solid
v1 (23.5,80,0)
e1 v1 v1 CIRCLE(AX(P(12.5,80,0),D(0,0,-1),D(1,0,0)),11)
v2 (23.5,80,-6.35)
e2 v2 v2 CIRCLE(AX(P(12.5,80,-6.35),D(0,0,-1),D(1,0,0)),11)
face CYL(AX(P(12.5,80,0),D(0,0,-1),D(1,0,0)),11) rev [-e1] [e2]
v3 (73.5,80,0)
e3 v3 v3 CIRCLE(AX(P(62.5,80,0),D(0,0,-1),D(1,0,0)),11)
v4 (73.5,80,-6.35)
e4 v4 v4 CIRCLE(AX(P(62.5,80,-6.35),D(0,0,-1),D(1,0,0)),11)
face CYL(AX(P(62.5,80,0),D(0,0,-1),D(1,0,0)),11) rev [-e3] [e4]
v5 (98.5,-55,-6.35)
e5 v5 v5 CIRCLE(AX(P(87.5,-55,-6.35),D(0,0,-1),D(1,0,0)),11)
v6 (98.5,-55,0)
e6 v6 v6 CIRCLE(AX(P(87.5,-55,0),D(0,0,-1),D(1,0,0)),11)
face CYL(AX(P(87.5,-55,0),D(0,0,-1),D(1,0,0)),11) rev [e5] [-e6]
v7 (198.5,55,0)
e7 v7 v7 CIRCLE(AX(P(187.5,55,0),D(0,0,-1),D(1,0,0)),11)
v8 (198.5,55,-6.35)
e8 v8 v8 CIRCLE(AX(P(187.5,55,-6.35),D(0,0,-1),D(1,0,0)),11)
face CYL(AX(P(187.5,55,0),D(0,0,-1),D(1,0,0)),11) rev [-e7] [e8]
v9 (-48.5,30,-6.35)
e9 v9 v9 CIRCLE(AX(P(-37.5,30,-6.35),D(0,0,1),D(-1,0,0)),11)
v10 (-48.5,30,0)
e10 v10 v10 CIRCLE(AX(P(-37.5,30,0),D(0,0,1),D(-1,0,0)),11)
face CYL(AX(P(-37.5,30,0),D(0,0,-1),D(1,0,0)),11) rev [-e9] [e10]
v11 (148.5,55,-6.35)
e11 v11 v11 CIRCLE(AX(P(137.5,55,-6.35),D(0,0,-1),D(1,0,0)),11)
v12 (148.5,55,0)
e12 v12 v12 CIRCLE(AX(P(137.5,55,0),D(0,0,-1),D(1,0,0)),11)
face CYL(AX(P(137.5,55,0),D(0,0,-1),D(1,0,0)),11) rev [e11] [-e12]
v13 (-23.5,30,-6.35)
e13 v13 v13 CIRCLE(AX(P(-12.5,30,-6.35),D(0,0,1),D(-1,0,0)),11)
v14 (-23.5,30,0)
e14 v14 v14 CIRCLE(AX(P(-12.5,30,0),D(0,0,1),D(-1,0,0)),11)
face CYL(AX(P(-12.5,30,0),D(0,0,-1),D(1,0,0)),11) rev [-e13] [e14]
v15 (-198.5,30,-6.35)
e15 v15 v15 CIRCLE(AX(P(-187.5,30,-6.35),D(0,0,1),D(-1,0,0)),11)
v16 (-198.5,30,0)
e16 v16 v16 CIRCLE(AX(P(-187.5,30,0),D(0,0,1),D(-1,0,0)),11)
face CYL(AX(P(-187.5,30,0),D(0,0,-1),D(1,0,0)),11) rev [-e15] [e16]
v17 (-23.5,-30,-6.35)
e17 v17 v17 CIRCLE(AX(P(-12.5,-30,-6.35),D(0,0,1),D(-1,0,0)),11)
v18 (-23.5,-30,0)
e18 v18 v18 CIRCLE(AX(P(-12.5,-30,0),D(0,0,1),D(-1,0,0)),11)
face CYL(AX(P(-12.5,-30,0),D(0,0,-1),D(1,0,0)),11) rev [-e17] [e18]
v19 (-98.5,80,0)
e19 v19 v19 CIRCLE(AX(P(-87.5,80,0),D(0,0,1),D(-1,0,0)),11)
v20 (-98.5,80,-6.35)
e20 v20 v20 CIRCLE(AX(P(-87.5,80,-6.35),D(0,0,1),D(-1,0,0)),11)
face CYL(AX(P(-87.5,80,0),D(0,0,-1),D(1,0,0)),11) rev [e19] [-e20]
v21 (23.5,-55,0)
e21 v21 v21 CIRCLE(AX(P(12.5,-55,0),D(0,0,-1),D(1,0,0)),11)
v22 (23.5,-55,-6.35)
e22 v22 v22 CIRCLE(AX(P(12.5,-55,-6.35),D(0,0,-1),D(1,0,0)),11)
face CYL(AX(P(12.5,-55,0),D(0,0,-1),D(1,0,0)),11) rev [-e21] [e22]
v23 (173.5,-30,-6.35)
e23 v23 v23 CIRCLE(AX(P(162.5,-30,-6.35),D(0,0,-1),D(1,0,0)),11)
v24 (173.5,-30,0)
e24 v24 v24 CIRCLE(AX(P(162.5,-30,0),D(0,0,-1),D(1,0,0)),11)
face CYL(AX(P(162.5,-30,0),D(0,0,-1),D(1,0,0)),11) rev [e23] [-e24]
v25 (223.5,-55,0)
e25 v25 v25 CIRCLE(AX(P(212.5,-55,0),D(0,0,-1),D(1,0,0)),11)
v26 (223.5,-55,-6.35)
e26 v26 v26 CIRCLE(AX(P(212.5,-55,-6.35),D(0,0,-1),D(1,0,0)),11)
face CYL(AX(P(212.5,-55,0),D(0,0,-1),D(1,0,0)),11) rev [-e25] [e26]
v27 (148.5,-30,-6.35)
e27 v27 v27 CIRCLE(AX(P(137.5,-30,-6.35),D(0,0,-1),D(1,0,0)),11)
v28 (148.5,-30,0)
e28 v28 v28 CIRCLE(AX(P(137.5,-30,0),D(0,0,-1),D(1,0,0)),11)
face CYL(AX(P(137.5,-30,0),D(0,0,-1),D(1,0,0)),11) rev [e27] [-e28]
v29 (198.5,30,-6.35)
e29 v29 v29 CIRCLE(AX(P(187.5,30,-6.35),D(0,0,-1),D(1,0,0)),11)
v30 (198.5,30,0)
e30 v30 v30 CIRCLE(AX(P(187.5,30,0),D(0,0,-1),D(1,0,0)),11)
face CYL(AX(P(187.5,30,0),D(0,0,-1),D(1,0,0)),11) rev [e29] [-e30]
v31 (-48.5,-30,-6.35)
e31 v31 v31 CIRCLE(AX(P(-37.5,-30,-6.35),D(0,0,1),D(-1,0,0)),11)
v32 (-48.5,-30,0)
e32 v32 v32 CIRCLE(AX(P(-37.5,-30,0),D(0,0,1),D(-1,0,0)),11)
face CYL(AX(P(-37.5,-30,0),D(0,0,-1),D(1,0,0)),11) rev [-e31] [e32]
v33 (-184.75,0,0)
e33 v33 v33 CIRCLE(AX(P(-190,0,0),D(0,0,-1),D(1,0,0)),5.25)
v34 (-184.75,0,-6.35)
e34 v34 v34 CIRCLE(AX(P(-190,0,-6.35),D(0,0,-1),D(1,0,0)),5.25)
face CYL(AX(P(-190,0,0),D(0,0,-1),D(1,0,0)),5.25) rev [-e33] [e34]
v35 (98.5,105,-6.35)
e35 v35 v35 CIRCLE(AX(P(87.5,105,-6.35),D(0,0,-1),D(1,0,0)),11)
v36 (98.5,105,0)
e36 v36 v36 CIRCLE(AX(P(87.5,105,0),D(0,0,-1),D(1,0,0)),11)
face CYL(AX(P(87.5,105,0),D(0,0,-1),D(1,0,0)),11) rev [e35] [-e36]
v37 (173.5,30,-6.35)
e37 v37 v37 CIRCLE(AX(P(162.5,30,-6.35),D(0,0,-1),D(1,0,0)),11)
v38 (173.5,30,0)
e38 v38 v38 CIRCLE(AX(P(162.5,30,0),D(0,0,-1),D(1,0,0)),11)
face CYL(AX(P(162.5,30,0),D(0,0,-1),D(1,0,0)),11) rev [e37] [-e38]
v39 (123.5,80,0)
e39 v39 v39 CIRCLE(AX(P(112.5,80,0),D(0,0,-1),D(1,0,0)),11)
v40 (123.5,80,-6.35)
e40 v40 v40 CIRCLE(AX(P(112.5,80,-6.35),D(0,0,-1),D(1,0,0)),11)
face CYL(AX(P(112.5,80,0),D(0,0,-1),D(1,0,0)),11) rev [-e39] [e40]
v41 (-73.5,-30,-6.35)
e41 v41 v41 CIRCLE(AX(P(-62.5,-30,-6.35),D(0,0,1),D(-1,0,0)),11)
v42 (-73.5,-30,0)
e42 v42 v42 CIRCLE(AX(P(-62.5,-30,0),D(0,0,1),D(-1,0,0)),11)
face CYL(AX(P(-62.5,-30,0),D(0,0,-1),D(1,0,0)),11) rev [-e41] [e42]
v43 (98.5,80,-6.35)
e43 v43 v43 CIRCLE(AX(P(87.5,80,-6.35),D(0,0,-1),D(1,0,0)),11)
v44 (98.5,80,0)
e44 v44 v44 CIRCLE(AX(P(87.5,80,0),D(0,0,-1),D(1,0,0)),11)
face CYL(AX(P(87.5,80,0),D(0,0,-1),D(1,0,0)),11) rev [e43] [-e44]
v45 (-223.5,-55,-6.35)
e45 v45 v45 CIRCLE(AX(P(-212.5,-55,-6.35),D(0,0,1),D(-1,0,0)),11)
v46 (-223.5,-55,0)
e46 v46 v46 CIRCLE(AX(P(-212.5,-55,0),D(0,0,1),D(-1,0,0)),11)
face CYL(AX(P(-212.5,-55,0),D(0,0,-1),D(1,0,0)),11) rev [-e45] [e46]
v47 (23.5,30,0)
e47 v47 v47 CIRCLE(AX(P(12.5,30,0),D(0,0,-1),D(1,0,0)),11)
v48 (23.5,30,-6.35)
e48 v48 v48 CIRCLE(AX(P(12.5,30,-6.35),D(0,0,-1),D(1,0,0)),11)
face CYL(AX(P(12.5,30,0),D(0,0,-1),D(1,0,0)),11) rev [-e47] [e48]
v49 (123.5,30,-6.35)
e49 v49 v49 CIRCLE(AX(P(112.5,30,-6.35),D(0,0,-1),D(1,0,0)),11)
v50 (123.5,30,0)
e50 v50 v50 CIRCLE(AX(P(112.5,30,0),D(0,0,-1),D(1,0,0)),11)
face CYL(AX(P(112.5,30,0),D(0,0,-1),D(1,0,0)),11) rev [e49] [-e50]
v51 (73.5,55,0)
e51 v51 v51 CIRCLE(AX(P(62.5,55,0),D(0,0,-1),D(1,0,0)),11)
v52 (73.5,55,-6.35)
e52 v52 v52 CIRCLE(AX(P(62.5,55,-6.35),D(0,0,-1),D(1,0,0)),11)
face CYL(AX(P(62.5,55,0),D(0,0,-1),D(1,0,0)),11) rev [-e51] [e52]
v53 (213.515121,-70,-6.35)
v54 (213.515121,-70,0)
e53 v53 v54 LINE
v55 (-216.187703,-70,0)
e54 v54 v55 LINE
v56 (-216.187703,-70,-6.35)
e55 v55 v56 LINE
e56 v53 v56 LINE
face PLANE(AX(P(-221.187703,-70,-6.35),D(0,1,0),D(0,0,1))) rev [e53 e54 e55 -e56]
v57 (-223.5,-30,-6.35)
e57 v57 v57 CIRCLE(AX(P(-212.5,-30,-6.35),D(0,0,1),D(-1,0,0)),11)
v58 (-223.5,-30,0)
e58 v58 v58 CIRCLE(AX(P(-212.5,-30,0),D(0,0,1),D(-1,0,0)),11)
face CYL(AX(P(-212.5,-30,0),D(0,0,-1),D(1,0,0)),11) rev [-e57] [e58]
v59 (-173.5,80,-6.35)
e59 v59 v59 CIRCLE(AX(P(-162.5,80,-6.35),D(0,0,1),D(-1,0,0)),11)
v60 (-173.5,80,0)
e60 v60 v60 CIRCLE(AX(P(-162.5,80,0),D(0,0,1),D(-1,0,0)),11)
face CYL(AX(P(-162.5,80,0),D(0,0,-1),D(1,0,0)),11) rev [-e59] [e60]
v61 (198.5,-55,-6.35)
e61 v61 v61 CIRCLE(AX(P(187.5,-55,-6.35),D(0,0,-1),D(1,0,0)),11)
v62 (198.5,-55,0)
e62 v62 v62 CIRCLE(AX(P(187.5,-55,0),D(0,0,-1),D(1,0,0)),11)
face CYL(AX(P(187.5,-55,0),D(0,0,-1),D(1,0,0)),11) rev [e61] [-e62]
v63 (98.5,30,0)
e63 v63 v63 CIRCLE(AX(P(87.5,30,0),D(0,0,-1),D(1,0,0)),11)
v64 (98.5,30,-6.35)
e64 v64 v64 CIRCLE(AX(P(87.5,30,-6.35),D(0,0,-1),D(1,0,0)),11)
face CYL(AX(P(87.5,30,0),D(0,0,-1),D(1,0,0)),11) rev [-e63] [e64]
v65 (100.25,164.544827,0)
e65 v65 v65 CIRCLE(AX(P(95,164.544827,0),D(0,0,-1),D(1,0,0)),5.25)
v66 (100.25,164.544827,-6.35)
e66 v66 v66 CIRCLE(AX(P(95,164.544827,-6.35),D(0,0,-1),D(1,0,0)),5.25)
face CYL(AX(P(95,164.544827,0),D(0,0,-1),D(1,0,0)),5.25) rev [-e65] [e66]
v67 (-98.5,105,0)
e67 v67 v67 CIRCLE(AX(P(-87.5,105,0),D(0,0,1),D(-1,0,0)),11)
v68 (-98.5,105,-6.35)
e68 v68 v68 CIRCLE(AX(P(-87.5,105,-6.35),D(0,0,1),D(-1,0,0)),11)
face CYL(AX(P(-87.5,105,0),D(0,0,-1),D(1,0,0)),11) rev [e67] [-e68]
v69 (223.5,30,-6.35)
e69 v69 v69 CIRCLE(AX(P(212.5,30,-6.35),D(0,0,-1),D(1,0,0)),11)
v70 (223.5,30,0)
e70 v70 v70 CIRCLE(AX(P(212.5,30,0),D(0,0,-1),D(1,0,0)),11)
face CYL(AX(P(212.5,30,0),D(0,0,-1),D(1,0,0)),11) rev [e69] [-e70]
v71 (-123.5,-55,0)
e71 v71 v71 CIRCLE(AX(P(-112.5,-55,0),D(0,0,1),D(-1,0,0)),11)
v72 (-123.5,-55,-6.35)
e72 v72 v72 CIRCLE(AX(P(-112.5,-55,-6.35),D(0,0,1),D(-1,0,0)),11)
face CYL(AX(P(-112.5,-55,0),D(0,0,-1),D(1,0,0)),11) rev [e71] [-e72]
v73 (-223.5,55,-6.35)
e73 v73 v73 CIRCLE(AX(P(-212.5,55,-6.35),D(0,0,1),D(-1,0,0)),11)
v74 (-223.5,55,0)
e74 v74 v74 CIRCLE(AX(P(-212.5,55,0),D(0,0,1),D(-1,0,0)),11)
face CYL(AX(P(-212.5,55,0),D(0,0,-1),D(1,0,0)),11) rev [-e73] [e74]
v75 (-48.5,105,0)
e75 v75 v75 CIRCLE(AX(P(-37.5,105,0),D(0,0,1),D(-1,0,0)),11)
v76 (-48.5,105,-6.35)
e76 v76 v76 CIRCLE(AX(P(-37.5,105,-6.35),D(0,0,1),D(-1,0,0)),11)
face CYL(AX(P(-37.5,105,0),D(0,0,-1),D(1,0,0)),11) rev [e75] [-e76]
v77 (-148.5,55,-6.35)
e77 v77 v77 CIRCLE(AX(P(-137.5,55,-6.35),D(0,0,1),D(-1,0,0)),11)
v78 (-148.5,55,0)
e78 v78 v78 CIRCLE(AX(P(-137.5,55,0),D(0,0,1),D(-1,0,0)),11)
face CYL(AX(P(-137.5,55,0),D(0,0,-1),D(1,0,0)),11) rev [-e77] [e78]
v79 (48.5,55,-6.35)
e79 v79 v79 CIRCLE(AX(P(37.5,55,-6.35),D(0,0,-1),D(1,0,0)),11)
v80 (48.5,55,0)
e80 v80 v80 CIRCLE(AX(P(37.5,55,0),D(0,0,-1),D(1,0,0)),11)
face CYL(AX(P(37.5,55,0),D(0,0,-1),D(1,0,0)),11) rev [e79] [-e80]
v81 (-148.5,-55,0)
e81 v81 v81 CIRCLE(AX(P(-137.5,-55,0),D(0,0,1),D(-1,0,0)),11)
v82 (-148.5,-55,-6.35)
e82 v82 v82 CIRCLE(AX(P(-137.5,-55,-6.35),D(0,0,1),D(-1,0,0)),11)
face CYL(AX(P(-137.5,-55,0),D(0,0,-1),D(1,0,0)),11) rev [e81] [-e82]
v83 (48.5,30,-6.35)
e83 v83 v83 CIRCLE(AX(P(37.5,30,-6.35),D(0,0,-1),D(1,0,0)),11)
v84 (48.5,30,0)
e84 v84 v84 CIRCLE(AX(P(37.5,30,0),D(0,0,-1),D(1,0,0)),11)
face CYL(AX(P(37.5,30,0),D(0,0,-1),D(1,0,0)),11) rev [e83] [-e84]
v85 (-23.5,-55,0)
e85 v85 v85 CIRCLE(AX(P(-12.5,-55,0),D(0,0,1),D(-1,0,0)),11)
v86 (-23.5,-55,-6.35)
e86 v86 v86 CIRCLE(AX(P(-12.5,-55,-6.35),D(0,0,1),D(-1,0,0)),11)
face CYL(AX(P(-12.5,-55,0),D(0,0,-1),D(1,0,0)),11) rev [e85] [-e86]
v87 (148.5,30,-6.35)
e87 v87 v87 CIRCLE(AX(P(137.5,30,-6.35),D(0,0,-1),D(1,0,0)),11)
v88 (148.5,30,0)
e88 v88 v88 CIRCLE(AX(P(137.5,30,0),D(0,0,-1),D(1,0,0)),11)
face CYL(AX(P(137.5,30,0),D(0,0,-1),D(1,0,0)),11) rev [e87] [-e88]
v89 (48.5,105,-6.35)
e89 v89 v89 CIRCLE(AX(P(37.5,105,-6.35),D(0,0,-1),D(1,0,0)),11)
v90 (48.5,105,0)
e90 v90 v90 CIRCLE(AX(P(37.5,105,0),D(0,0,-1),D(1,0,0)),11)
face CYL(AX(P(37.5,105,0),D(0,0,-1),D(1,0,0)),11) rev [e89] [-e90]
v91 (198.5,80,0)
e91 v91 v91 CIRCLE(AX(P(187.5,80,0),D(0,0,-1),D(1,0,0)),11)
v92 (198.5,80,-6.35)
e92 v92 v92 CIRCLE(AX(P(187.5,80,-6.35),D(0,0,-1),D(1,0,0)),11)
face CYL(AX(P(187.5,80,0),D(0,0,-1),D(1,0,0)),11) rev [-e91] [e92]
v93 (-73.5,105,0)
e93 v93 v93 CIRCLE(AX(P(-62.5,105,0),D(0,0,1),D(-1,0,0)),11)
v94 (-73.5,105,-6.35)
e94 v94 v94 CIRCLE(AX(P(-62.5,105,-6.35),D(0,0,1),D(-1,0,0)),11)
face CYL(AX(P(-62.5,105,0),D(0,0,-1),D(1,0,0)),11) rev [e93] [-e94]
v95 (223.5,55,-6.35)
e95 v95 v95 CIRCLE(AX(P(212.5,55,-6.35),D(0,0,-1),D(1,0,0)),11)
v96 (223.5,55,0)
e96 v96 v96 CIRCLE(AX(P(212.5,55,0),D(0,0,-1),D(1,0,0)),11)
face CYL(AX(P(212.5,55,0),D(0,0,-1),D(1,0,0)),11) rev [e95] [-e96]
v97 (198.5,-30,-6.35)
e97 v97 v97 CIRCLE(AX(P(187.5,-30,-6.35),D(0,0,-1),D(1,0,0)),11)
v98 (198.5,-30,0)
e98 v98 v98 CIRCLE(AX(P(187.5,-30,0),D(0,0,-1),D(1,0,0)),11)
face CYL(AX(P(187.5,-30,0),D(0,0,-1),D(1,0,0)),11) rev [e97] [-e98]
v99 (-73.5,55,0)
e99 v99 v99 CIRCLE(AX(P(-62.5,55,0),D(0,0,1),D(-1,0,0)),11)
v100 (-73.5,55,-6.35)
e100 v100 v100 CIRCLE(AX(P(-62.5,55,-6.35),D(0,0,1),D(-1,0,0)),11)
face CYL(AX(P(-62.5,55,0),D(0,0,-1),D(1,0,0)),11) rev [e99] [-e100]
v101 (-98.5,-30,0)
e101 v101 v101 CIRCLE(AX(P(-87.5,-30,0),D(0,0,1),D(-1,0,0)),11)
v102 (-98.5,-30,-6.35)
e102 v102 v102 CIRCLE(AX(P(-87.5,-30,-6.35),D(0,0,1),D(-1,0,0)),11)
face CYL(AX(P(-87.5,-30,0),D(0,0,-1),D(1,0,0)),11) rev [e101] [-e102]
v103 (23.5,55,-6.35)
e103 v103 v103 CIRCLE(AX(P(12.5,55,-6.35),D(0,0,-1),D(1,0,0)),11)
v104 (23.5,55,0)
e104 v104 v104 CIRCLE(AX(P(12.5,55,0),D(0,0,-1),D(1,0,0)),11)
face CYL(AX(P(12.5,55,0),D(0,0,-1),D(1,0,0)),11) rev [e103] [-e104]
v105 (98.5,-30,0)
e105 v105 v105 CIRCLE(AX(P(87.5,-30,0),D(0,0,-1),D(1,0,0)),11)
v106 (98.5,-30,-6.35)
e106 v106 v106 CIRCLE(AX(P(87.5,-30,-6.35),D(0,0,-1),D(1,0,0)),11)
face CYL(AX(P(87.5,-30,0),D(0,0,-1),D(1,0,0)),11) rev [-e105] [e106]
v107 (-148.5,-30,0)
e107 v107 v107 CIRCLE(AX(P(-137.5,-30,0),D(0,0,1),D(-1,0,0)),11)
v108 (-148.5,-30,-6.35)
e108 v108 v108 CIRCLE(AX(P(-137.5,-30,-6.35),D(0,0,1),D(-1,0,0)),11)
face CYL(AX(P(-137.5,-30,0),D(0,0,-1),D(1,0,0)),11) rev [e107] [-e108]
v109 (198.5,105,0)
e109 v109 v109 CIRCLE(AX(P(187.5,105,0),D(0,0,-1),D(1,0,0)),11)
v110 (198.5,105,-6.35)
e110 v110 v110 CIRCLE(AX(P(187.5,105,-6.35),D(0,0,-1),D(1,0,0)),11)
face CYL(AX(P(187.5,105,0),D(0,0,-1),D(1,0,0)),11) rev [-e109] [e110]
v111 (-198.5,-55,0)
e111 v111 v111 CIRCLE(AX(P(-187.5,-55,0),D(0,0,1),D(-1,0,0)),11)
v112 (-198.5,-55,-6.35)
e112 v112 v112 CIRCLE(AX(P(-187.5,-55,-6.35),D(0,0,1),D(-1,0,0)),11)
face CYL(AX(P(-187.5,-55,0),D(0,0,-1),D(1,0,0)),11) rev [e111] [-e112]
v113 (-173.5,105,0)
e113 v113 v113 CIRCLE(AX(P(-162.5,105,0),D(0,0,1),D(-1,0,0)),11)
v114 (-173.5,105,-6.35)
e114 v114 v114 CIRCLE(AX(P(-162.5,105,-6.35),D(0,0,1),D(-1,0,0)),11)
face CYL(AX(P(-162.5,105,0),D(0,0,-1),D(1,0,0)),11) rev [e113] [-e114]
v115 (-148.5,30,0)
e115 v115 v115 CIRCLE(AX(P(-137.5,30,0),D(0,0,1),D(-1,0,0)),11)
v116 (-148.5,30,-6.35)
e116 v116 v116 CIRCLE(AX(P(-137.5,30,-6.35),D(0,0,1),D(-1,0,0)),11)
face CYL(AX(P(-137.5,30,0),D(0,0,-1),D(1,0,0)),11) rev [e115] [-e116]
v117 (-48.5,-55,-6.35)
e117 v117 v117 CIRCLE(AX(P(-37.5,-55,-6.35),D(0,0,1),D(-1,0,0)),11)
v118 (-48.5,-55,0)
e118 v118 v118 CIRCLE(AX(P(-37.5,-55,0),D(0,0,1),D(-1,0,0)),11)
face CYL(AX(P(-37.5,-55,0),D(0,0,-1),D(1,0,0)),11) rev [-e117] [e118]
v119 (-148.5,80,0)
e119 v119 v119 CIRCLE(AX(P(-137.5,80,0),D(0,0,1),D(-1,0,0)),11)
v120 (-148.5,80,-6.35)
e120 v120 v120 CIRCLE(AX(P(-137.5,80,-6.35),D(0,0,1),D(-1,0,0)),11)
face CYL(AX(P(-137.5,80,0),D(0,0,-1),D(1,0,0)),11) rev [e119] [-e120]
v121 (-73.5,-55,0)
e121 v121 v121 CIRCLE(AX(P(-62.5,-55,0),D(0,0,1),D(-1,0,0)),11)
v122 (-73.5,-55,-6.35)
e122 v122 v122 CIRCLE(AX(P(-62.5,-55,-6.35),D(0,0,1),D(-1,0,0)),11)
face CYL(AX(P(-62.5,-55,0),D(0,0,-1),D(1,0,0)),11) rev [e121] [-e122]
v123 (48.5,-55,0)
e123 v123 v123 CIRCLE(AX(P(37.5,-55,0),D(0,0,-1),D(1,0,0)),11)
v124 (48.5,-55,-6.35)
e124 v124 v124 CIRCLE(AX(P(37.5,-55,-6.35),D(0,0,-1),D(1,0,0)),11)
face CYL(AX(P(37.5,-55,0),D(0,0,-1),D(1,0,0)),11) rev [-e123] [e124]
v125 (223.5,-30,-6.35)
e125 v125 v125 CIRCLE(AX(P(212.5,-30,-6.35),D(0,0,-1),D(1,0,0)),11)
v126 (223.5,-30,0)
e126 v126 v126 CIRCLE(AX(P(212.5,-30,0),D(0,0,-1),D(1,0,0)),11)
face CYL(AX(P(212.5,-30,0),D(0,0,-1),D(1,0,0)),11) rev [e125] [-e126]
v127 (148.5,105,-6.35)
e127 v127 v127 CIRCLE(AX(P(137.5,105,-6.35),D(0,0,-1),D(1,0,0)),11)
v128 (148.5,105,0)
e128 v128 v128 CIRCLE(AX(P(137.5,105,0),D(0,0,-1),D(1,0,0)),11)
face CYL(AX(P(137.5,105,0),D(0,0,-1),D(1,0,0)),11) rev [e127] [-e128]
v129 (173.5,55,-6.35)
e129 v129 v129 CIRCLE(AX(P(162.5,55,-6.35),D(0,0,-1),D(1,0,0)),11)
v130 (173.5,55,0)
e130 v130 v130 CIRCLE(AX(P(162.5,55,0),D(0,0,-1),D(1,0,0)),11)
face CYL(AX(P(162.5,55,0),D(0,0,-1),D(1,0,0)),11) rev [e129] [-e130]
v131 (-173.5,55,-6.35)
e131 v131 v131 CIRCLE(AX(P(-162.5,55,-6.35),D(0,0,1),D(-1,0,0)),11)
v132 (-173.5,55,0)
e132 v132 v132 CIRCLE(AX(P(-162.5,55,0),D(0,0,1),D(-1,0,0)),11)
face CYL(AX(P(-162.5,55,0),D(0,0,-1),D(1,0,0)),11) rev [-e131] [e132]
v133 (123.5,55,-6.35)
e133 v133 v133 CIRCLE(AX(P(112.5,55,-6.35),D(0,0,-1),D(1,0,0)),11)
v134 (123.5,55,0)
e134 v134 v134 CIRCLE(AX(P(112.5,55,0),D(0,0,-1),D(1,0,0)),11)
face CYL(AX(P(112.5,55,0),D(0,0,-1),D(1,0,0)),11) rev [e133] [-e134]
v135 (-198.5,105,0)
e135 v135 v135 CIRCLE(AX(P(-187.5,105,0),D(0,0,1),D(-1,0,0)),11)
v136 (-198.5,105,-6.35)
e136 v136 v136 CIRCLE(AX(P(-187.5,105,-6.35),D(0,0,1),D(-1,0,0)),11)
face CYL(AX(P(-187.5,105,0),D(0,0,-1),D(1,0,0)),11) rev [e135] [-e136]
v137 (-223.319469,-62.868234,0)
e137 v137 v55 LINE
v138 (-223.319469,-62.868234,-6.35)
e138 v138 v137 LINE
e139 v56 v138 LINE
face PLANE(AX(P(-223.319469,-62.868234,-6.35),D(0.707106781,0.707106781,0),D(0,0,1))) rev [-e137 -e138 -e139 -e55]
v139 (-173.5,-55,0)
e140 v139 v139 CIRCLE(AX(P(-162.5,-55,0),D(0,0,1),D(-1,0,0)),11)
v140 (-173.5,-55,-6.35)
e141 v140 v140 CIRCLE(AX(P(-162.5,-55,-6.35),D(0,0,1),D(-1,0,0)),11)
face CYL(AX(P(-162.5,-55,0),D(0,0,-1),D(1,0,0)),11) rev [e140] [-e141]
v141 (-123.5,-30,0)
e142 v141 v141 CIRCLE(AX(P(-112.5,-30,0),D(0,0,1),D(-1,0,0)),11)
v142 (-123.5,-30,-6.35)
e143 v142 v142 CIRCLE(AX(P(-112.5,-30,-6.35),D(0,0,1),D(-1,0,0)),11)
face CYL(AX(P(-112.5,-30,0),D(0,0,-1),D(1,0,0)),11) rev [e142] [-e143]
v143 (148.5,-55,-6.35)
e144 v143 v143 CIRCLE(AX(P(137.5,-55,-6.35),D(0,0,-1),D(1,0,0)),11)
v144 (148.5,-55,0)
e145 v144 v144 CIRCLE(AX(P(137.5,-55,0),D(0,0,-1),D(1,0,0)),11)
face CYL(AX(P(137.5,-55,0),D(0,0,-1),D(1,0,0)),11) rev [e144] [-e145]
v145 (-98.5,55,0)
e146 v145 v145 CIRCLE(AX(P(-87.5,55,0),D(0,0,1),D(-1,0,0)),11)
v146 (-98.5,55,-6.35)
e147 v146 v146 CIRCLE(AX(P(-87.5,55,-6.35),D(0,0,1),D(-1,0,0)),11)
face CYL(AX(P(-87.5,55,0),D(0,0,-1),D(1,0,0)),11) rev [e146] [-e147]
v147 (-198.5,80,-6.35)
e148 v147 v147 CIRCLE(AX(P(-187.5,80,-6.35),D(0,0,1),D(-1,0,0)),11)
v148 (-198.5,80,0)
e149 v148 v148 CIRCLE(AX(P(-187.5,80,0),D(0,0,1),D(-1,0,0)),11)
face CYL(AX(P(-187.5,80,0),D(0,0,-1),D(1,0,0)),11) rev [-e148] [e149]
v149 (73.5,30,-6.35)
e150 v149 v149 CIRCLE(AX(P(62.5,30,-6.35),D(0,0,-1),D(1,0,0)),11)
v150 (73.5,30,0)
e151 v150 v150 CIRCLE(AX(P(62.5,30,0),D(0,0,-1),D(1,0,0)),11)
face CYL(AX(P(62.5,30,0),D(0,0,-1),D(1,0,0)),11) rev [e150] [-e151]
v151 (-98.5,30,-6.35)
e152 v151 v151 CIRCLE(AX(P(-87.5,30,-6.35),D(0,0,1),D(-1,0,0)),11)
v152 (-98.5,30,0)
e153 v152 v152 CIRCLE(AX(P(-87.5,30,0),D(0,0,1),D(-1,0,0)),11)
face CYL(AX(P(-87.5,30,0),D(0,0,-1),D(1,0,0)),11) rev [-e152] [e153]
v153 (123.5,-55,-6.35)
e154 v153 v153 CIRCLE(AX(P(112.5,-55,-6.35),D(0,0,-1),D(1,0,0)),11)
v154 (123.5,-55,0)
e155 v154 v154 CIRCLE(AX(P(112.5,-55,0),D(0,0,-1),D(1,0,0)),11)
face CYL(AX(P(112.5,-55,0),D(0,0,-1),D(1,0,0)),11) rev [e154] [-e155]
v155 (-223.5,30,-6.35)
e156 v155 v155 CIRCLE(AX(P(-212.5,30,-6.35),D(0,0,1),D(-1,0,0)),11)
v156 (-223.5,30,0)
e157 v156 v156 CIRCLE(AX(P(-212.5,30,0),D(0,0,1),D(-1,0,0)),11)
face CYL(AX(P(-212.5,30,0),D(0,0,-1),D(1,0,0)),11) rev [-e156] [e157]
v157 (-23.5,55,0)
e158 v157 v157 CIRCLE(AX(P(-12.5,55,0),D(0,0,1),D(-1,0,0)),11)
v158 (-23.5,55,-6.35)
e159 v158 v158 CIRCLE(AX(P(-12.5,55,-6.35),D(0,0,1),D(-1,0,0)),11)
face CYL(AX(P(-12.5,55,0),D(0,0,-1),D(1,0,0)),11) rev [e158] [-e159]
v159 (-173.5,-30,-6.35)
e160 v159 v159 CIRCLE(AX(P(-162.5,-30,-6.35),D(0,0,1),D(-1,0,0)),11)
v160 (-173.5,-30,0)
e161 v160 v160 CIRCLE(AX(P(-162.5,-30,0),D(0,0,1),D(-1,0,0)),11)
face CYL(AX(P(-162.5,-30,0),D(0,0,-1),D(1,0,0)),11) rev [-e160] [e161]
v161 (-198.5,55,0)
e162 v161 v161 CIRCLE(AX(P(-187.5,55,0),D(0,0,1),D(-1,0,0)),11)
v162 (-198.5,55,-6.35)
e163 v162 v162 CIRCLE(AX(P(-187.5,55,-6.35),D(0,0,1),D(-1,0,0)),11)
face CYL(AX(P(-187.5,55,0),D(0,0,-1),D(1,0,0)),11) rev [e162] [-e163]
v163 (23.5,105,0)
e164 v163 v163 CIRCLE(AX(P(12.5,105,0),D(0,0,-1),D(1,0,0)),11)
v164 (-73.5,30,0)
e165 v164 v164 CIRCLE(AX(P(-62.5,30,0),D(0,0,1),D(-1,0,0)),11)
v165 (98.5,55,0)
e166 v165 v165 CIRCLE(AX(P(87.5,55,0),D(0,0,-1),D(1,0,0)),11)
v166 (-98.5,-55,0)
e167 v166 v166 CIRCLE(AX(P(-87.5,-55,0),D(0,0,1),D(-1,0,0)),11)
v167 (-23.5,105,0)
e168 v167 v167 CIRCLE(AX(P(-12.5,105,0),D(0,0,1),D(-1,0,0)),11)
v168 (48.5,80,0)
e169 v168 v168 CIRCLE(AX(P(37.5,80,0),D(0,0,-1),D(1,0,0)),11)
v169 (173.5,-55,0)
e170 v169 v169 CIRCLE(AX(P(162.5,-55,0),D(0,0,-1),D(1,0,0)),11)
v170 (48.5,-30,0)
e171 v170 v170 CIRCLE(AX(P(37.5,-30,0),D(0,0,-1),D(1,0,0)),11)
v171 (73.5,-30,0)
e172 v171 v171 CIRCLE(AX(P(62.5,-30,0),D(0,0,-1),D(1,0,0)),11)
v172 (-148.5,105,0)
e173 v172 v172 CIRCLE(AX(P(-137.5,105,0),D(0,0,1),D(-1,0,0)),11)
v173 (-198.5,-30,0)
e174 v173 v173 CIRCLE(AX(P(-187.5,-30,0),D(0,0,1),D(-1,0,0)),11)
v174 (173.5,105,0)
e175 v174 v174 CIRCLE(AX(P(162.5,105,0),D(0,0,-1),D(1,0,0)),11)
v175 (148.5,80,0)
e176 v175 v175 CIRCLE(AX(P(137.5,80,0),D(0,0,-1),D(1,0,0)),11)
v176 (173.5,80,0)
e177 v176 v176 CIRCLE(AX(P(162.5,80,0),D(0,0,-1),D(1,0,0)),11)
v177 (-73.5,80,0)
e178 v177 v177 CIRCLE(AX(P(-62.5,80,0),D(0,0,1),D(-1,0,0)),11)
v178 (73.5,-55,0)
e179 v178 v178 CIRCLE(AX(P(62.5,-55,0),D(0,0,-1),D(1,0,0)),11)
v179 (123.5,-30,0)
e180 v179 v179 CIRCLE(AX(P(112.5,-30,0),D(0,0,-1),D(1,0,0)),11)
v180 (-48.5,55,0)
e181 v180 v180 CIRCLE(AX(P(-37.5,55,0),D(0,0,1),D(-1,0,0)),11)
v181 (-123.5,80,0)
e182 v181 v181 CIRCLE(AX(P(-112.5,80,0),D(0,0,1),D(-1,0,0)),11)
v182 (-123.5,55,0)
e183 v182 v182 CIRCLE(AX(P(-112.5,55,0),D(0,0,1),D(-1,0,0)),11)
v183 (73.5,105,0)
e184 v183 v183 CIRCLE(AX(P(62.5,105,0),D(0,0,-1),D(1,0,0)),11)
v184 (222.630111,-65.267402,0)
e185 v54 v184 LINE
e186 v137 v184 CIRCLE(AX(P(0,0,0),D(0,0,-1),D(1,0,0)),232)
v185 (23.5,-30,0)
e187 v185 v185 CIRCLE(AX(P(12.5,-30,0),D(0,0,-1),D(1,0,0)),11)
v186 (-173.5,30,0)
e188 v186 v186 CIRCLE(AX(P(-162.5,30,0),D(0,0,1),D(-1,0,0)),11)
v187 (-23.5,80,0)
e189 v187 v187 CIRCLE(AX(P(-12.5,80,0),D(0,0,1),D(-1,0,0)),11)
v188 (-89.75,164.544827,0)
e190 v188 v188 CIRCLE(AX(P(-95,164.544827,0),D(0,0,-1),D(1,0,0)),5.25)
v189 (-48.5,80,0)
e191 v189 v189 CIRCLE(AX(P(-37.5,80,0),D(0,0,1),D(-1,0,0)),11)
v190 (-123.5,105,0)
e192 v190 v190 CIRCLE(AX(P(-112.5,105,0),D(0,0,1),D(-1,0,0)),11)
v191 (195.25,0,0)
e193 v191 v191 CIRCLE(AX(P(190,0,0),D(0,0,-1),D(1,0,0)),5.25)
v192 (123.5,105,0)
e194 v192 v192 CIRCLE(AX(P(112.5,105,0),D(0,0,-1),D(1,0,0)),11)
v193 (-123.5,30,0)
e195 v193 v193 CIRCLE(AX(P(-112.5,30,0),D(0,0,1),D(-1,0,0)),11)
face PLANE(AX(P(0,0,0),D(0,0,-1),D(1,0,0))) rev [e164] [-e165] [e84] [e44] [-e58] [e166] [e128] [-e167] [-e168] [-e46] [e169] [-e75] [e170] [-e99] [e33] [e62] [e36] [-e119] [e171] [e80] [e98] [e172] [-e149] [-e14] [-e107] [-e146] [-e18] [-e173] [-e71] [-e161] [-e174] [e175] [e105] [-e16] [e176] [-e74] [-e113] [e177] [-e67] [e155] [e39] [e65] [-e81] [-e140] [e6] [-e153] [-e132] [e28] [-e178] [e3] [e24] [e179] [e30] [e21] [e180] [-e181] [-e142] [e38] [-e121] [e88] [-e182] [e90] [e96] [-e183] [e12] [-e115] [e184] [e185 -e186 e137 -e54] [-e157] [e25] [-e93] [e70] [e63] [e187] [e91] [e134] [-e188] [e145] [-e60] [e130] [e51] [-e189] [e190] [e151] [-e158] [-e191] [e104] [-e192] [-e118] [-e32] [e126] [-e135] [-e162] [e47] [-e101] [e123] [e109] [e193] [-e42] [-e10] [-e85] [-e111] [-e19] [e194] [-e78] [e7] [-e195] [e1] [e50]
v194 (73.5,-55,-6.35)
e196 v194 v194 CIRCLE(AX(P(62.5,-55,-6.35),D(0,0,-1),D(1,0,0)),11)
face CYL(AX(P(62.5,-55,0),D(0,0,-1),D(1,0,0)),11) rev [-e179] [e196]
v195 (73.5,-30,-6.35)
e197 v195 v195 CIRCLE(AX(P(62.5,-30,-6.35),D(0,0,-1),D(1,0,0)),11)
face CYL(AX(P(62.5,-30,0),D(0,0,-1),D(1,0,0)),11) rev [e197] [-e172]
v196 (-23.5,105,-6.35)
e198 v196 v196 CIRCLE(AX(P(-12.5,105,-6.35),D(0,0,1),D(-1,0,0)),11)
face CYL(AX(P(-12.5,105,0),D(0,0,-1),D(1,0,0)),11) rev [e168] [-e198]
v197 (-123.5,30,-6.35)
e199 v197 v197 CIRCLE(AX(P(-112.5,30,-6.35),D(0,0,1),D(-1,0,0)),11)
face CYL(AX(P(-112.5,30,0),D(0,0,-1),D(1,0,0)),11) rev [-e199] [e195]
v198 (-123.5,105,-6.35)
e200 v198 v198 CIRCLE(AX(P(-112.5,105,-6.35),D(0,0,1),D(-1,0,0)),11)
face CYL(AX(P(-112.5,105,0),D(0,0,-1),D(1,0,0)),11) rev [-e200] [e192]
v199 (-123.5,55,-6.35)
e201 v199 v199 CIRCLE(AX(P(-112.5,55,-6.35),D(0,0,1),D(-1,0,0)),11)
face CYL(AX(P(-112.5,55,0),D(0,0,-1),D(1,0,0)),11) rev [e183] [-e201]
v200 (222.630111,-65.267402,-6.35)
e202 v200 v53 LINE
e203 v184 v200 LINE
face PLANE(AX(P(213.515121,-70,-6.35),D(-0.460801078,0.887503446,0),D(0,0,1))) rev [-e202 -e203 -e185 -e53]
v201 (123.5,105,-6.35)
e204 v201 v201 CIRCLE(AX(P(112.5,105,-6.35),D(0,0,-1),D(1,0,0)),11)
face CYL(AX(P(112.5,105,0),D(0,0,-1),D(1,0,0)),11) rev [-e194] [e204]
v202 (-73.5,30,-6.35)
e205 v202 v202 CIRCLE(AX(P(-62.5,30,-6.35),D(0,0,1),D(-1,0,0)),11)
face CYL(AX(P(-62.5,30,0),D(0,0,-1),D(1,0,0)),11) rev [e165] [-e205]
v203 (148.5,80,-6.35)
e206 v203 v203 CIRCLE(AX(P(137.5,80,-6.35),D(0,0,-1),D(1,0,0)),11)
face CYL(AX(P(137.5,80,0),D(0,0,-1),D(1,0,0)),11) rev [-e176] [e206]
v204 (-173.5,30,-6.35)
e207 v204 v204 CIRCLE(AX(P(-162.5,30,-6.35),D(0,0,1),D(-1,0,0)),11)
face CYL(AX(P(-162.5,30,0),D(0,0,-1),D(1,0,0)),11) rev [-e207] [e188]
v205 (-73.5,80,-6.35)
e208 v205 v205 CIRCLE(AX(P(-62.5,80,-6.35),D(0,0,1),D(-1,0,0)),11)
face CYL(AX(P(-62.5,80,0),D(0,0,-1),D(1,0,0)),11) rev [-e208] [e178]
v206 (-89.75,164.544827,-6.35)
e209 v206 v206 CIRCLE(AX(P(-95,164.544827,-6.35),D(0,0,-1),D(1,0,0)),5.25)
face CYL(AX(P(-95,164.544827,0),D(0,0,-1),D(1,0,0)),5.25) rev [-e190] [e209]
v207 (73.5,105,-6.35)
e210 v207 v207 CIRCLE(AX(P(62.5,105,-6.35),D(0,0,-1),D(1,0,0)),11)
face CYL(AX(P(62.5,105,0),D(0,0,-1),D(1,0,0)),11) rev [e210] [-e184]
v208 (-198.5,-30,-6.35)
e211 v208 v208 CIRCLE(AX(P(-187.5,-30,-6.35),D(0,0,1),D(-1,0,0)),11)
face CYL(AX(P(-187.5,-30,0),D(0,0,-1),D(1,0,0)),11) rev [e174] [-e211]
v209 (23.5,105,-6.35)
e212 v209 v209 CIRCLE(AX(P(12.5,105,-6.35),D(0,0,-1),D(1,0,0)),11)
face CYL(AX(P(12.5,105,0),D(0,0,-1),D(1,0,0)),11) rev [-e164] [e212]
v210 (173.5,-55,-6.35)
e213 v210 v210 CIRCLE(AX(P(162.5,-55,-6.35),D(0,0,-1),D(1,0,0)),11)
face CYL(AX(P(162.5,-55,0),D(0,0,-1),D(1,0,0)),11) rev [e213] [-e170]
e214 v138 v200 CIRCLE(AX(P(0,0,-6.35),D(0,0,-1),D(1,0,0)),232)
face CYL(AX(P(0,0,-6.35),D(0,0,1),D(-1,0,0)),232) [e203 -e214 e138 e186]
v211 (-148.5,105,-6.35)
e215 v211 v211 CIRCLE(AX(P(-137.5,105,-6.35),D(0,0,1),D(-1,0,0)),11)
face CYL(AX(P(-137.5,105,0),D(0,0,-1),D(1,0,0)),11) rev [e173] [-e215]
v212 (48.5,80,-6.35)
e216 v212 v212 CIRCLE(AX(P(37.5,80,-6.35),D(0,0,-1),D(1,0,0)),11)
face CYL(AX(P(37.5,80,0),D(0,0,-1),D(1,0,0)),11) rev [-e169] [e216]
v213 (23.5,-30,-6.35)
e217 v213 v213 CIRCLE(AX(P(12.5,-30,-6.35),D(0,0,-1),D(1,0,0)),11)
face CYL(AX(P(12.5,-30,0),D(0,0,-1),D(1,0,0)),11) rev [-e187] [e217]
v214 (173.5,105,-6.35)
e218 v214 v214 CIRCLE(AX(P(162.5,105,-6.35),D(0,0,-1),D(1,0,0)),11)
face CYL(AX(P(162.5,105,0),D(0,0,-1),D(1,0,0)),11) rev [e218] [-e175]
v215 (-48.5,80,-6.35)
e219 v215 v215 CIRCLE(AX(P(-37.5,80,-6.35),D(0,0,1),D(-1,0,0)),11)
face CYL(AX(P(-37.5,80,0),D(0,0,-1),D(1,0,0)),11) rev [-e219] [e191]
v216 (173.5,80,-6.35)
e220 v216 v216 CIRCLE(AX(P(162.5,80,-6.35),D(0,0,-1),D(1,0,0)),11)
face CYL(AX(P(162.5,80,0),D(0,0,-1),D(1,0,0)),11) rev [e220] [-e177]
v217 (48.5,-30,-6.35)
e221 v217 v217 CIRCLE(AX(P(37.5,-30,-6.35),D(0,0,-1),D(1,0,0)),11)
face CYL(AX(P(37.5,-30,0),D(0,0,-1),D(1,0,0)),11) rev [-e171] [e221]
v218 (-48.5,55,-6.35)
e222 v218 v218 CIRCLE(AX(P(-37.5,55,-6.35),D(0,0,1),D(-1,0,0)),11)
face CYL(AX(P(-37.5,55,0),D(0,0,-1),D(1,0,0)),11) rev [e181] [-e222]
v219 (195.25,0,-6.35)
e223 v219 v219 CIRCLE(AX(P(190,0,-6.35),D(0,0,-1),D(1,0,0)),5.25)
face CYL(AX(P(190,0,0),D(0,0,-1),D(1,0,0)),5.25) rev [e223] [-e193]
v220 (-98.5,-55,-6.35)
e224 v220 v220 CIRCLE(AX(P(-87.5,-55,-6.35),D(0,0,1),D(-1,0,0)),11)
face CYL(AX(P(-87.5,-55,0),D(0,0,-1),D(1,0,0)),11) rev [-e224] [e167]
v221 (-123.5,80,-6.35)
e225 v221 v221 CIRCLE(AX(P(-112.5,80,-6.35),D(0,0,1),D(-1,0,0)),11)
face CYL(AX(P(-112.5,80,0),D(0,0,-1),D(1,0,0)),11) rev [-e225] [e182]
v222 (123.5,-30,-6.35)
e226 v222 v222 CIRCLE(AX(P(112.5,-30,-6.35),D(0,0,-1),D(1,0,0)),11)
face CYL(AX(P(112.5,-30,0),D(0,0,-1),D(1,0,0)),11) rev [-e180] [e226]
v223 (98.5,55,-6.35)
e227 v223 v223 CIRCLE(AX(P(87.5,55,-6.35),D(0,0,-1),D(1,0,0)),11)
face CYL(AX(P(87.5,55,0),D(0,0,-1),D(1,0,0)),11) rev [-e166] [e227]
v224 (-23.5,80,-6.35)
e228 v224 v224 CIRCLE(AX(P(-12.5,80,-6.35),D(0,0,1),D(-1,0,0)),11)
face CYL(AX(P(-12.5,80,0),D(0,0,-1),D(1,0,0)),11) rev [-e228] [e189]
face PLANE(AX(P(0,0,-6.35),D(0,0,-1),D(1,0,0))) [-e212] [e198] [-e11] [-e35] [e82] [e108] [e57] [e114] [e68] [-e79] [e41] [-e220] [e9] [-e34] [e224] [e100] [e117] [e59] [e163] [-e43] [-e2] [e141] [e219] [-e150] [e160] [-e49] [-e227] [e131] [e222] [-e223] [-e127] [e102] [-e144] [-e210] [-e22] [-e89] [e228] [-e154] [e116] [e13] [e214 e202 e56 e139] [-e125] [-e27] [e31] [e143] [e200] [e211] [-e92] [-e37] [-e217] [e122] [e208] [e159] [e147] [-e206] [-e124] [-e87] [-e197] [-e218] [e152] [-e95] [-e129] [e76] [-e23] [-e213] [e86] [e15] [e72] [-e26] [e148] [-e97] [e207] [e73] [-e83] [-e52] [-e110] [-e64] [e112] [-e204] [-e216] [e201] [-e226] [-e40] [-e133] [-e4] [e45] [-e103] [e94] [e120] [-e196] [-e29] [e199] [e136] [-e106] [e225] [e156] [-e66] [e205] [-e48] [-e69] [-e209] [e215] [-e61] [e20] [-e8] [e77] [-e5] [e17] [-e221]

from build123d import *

# Parameters (mm, degrees)
BOSS_EXTRUDE1_DEPTH   = 6.35
CHAMFER1_SIZE         = 5
CHAMFER1_SIZE_2       = 7.672581673
SKETCH2_R             = 5.25
CUT_EXTRUDE1_DEPTH    = 329.158989668
SKETCH3_R             = 11
CUT_EXTRUDE2_DEPTH    = 329.158989668
BODY_MOVE_COPY1_ANGLE = 180


with BuildPart() as part:
    # Sketch1 → Boss-Extrude1 (new body)
    with BuildSketch(Plane.XY):
        with BuildLine():
            Line((-221.187703094, 70), (221.187703094, 70))
            ThreePointArc((221.187703094, 70), (0, -232), (-221.187703094, 70))
        make_face()
    extrude(amount=BOSS_EXTRUDE1_DEPTH)

    # Chamfer1
    # the kernel refuses this chamfer: 7.672581673, 5 mm, written as the material it takes off along each edge
    with BuildSketch(Plane(origin=(-221.187703094, 70, -19.287514673), x_dir=(1, 0, 0), z_dir=(0, 0, 1))) as chamfer1_piece_1:
        with BuildLine():
            Line((CHAMFER1_SIZE, 0), (-2.131765618, -7.131765618))
            ThreePointArc((-2.131765618, -7.131765618), (-1.133115382, -3.68670064), (0, 0))
            Line((0, 0), (CHAMFER1_SIZE, 0))
        make_face()
    extrude(amount=44.925029345, mode=Mode.SUBTRACT)
    with BuildSketch(Plane(origin=(221.187703094, 70, -19.865544851), x_dir=(-1, 0, 0), z_dir=(0, 0, 1))) as chamfer1_piece_2:
        with BuildLine():
            Line((CHAMFER1_SIZE_2, 0), (-1.44240767, 4.732597867))
            ThreePointArc((-1.44240767, 4.732597867), (-0.765078162, 2.465098705), (0, 0))
            Line((0, 0), (CHAMFER1_SIZE_2, 0))
        make_face()
    extrude(amount=46.081089702, mode=Mode.SUBTRACT)

    # Sketch2 → Cut-Extrude1 (cut, through all)
    with BuildSketch(Plane.XY.offset(6.35)):
        with Locations((-190, 0)):
            Circle(SKETCH2_R)
        with Locations((190, 0)):
            Circle(SKETCH2_R)
        with Locations((95, -164.544826719)):
            Circle(SKETCH2_R)
        with Locations((-95, -164.544826719)):
            Circle(SKETCH2_R)
    extrude(amount=-CUT_EXTRUDE1_DEPTH, mode=Mode.SUBTRACT)

    # Sketch3 → Cut-Extrude2 (cut, through all)
    with BuildSketch(Plane.XY.offset(6.35)):
        with Locations((12.5, -30)):
            Circle(SKETCH3_R)
        with Locations((12.5, -55)):
            Circle(SKETCH3_R)
        with Locations((12.5, -80)):
            Circle(SKETCH3_R)
        with Locations((12.5, -105)):
            Circle(SKETCH3_R)
        with Locations((37.5, -30)):
            Circle(SKETCH3_R)
        with Locations((37.5, -55)):
            Circle(SKETCH3_R)
        with Locations((62.5, -30)):
            Circle(SKETCH3_R)
        with Locations((62.5, -55)):
            Circle(SKETCH3_R)
        with Locations((87.5, -30)):
            Circle(SKETCH3_R)
        with Locations((87.5, -55)):
            Circle(SKETCH3_R)
        with Locations((112.5, -30)):
            Circle(SKETCH3_R)
        with Locations((112.5, -55)):
            Circle(SKETCH3_R)
        with Locations((137.5, -30)):
            Circle(SKETCH3_R)
        with Locations((137.5, -55)):
            Circle(SKETCH3_R)
        with Locations((162.5, -30)):
            Circle(SKETCH3_R)
        with Locations((162.5, -55)):
            Circle(SKETCH3_R)
        with Locations((187.5, -30)):
            Circle(SKETCH3_R)
        with Locations((187.5, -55)):
            Circle(SKETCH3_R)
        with Locations((212.5, -30)):
            Circle(SKETCH3_R)
        with Locations((212.5, -55)):
            Circle(SKETCH3_R)
        with Locations((37.5, -80)):
            Circle(SKETCH3_R)
        with Locations((37.5, -105)):
            Circle(SKETCH3_R)
        with Locations((62.5, -80)):
            Circle(SKETCH3_R)
        with Locations((62.5, -105)):
            Circle(SKETCH3_R)
        with Locations((87.5, -80)):
            Circle(SKETCH3_R)
        with Locations((87.5, -105)):
            Circle(SKETCH3_R)
        with Locations((112.5, -80)):
            Circle(SKETCH3_R)
        with Locations((112.5, -105)):
            Circle(SKETCH3_R)
        with Locations((137.5, -80)):
            Circle(SKETCH3_R)
        with Locations((137.5, -105)):
            Circle(SKETCH3_R)
        with Locations((162.5, -80)):
            Circle(SKETCH3_R)
        with Locations((162.5, -105)):
            Circle(SKETCH3_R)
        with Locations((187.5, -80)):
            Circle(SKETCH3_R)
        with Locations((187.5, -105)):
            Circle(SKETCH3_R)
        with Locations((12.5, 30)):
            Circle(SKETCH3_R)
        with Locations((12.5, 55)):
            Circle(SKETCH3_R)
        with Locations((37.5, 55)):
            Circle(SKETCH3_R)
        with Locations((37.5, 30)):
            Circle(SKETCH3_R)
        with Locations((62.5, 55)):
            Circle(SKETCH3_R)
        with Locations((62.5, 30)):
            Circle(SKETCH3_R)
        with Locations((87.5, 55)):
            Circle(SKETCH3_R)
        with Locations((87.5, 30)):
            Circle(SKETCH3_R)
        with Locations((112.5, 55)):
            Circle(SKETCH3_R)
        with Locations((112.5, 30)):
            Circle(SKETCH3_R)
        with Locations((137.5, 55)):
            Circle(SKETCH3_R)
        with Locations((137.5, 30)):
            Circle(SKETCH3_R)
        with Locations((162.5, 55)):
            Circle(SKETCH3_R)
        with Locations((162.5, 30)):
            Circle(SKETCH3_R)
        with Locations((187.5, 55)):
            Circle(SKETCH3_R)
        with Locations((187.5, 30)):
            Circle(SKETCH3_R)
        with Locations((212.5, 55)):
            Circle(SKETCH3_R)
        with Locations((212.5, 30)):
            Circle(SKETCH3_R)
    cut_extrude2 = extrude(amount=-CUT_EXTRUDE2_DEPTH, mode=Mode.SUBTRACT)

    # Mirror2: Cut-Extrude2 across plane
    add(cut_extrude2.mirror(Plane(origin=(0, 0, 0), x_dir=(0, 0, 1), z_dir=(1, 0, 0))), mode=Mode.SUBTRACT)


with BuildPart() as part_1:
    # Body-Move/Copy1: moved
    add(part.part.rotate(Axis((0, 0, 0), (1, 0, 0)), BODY_MOVE_COPY1_ANGLE))


solid = part_1.part
